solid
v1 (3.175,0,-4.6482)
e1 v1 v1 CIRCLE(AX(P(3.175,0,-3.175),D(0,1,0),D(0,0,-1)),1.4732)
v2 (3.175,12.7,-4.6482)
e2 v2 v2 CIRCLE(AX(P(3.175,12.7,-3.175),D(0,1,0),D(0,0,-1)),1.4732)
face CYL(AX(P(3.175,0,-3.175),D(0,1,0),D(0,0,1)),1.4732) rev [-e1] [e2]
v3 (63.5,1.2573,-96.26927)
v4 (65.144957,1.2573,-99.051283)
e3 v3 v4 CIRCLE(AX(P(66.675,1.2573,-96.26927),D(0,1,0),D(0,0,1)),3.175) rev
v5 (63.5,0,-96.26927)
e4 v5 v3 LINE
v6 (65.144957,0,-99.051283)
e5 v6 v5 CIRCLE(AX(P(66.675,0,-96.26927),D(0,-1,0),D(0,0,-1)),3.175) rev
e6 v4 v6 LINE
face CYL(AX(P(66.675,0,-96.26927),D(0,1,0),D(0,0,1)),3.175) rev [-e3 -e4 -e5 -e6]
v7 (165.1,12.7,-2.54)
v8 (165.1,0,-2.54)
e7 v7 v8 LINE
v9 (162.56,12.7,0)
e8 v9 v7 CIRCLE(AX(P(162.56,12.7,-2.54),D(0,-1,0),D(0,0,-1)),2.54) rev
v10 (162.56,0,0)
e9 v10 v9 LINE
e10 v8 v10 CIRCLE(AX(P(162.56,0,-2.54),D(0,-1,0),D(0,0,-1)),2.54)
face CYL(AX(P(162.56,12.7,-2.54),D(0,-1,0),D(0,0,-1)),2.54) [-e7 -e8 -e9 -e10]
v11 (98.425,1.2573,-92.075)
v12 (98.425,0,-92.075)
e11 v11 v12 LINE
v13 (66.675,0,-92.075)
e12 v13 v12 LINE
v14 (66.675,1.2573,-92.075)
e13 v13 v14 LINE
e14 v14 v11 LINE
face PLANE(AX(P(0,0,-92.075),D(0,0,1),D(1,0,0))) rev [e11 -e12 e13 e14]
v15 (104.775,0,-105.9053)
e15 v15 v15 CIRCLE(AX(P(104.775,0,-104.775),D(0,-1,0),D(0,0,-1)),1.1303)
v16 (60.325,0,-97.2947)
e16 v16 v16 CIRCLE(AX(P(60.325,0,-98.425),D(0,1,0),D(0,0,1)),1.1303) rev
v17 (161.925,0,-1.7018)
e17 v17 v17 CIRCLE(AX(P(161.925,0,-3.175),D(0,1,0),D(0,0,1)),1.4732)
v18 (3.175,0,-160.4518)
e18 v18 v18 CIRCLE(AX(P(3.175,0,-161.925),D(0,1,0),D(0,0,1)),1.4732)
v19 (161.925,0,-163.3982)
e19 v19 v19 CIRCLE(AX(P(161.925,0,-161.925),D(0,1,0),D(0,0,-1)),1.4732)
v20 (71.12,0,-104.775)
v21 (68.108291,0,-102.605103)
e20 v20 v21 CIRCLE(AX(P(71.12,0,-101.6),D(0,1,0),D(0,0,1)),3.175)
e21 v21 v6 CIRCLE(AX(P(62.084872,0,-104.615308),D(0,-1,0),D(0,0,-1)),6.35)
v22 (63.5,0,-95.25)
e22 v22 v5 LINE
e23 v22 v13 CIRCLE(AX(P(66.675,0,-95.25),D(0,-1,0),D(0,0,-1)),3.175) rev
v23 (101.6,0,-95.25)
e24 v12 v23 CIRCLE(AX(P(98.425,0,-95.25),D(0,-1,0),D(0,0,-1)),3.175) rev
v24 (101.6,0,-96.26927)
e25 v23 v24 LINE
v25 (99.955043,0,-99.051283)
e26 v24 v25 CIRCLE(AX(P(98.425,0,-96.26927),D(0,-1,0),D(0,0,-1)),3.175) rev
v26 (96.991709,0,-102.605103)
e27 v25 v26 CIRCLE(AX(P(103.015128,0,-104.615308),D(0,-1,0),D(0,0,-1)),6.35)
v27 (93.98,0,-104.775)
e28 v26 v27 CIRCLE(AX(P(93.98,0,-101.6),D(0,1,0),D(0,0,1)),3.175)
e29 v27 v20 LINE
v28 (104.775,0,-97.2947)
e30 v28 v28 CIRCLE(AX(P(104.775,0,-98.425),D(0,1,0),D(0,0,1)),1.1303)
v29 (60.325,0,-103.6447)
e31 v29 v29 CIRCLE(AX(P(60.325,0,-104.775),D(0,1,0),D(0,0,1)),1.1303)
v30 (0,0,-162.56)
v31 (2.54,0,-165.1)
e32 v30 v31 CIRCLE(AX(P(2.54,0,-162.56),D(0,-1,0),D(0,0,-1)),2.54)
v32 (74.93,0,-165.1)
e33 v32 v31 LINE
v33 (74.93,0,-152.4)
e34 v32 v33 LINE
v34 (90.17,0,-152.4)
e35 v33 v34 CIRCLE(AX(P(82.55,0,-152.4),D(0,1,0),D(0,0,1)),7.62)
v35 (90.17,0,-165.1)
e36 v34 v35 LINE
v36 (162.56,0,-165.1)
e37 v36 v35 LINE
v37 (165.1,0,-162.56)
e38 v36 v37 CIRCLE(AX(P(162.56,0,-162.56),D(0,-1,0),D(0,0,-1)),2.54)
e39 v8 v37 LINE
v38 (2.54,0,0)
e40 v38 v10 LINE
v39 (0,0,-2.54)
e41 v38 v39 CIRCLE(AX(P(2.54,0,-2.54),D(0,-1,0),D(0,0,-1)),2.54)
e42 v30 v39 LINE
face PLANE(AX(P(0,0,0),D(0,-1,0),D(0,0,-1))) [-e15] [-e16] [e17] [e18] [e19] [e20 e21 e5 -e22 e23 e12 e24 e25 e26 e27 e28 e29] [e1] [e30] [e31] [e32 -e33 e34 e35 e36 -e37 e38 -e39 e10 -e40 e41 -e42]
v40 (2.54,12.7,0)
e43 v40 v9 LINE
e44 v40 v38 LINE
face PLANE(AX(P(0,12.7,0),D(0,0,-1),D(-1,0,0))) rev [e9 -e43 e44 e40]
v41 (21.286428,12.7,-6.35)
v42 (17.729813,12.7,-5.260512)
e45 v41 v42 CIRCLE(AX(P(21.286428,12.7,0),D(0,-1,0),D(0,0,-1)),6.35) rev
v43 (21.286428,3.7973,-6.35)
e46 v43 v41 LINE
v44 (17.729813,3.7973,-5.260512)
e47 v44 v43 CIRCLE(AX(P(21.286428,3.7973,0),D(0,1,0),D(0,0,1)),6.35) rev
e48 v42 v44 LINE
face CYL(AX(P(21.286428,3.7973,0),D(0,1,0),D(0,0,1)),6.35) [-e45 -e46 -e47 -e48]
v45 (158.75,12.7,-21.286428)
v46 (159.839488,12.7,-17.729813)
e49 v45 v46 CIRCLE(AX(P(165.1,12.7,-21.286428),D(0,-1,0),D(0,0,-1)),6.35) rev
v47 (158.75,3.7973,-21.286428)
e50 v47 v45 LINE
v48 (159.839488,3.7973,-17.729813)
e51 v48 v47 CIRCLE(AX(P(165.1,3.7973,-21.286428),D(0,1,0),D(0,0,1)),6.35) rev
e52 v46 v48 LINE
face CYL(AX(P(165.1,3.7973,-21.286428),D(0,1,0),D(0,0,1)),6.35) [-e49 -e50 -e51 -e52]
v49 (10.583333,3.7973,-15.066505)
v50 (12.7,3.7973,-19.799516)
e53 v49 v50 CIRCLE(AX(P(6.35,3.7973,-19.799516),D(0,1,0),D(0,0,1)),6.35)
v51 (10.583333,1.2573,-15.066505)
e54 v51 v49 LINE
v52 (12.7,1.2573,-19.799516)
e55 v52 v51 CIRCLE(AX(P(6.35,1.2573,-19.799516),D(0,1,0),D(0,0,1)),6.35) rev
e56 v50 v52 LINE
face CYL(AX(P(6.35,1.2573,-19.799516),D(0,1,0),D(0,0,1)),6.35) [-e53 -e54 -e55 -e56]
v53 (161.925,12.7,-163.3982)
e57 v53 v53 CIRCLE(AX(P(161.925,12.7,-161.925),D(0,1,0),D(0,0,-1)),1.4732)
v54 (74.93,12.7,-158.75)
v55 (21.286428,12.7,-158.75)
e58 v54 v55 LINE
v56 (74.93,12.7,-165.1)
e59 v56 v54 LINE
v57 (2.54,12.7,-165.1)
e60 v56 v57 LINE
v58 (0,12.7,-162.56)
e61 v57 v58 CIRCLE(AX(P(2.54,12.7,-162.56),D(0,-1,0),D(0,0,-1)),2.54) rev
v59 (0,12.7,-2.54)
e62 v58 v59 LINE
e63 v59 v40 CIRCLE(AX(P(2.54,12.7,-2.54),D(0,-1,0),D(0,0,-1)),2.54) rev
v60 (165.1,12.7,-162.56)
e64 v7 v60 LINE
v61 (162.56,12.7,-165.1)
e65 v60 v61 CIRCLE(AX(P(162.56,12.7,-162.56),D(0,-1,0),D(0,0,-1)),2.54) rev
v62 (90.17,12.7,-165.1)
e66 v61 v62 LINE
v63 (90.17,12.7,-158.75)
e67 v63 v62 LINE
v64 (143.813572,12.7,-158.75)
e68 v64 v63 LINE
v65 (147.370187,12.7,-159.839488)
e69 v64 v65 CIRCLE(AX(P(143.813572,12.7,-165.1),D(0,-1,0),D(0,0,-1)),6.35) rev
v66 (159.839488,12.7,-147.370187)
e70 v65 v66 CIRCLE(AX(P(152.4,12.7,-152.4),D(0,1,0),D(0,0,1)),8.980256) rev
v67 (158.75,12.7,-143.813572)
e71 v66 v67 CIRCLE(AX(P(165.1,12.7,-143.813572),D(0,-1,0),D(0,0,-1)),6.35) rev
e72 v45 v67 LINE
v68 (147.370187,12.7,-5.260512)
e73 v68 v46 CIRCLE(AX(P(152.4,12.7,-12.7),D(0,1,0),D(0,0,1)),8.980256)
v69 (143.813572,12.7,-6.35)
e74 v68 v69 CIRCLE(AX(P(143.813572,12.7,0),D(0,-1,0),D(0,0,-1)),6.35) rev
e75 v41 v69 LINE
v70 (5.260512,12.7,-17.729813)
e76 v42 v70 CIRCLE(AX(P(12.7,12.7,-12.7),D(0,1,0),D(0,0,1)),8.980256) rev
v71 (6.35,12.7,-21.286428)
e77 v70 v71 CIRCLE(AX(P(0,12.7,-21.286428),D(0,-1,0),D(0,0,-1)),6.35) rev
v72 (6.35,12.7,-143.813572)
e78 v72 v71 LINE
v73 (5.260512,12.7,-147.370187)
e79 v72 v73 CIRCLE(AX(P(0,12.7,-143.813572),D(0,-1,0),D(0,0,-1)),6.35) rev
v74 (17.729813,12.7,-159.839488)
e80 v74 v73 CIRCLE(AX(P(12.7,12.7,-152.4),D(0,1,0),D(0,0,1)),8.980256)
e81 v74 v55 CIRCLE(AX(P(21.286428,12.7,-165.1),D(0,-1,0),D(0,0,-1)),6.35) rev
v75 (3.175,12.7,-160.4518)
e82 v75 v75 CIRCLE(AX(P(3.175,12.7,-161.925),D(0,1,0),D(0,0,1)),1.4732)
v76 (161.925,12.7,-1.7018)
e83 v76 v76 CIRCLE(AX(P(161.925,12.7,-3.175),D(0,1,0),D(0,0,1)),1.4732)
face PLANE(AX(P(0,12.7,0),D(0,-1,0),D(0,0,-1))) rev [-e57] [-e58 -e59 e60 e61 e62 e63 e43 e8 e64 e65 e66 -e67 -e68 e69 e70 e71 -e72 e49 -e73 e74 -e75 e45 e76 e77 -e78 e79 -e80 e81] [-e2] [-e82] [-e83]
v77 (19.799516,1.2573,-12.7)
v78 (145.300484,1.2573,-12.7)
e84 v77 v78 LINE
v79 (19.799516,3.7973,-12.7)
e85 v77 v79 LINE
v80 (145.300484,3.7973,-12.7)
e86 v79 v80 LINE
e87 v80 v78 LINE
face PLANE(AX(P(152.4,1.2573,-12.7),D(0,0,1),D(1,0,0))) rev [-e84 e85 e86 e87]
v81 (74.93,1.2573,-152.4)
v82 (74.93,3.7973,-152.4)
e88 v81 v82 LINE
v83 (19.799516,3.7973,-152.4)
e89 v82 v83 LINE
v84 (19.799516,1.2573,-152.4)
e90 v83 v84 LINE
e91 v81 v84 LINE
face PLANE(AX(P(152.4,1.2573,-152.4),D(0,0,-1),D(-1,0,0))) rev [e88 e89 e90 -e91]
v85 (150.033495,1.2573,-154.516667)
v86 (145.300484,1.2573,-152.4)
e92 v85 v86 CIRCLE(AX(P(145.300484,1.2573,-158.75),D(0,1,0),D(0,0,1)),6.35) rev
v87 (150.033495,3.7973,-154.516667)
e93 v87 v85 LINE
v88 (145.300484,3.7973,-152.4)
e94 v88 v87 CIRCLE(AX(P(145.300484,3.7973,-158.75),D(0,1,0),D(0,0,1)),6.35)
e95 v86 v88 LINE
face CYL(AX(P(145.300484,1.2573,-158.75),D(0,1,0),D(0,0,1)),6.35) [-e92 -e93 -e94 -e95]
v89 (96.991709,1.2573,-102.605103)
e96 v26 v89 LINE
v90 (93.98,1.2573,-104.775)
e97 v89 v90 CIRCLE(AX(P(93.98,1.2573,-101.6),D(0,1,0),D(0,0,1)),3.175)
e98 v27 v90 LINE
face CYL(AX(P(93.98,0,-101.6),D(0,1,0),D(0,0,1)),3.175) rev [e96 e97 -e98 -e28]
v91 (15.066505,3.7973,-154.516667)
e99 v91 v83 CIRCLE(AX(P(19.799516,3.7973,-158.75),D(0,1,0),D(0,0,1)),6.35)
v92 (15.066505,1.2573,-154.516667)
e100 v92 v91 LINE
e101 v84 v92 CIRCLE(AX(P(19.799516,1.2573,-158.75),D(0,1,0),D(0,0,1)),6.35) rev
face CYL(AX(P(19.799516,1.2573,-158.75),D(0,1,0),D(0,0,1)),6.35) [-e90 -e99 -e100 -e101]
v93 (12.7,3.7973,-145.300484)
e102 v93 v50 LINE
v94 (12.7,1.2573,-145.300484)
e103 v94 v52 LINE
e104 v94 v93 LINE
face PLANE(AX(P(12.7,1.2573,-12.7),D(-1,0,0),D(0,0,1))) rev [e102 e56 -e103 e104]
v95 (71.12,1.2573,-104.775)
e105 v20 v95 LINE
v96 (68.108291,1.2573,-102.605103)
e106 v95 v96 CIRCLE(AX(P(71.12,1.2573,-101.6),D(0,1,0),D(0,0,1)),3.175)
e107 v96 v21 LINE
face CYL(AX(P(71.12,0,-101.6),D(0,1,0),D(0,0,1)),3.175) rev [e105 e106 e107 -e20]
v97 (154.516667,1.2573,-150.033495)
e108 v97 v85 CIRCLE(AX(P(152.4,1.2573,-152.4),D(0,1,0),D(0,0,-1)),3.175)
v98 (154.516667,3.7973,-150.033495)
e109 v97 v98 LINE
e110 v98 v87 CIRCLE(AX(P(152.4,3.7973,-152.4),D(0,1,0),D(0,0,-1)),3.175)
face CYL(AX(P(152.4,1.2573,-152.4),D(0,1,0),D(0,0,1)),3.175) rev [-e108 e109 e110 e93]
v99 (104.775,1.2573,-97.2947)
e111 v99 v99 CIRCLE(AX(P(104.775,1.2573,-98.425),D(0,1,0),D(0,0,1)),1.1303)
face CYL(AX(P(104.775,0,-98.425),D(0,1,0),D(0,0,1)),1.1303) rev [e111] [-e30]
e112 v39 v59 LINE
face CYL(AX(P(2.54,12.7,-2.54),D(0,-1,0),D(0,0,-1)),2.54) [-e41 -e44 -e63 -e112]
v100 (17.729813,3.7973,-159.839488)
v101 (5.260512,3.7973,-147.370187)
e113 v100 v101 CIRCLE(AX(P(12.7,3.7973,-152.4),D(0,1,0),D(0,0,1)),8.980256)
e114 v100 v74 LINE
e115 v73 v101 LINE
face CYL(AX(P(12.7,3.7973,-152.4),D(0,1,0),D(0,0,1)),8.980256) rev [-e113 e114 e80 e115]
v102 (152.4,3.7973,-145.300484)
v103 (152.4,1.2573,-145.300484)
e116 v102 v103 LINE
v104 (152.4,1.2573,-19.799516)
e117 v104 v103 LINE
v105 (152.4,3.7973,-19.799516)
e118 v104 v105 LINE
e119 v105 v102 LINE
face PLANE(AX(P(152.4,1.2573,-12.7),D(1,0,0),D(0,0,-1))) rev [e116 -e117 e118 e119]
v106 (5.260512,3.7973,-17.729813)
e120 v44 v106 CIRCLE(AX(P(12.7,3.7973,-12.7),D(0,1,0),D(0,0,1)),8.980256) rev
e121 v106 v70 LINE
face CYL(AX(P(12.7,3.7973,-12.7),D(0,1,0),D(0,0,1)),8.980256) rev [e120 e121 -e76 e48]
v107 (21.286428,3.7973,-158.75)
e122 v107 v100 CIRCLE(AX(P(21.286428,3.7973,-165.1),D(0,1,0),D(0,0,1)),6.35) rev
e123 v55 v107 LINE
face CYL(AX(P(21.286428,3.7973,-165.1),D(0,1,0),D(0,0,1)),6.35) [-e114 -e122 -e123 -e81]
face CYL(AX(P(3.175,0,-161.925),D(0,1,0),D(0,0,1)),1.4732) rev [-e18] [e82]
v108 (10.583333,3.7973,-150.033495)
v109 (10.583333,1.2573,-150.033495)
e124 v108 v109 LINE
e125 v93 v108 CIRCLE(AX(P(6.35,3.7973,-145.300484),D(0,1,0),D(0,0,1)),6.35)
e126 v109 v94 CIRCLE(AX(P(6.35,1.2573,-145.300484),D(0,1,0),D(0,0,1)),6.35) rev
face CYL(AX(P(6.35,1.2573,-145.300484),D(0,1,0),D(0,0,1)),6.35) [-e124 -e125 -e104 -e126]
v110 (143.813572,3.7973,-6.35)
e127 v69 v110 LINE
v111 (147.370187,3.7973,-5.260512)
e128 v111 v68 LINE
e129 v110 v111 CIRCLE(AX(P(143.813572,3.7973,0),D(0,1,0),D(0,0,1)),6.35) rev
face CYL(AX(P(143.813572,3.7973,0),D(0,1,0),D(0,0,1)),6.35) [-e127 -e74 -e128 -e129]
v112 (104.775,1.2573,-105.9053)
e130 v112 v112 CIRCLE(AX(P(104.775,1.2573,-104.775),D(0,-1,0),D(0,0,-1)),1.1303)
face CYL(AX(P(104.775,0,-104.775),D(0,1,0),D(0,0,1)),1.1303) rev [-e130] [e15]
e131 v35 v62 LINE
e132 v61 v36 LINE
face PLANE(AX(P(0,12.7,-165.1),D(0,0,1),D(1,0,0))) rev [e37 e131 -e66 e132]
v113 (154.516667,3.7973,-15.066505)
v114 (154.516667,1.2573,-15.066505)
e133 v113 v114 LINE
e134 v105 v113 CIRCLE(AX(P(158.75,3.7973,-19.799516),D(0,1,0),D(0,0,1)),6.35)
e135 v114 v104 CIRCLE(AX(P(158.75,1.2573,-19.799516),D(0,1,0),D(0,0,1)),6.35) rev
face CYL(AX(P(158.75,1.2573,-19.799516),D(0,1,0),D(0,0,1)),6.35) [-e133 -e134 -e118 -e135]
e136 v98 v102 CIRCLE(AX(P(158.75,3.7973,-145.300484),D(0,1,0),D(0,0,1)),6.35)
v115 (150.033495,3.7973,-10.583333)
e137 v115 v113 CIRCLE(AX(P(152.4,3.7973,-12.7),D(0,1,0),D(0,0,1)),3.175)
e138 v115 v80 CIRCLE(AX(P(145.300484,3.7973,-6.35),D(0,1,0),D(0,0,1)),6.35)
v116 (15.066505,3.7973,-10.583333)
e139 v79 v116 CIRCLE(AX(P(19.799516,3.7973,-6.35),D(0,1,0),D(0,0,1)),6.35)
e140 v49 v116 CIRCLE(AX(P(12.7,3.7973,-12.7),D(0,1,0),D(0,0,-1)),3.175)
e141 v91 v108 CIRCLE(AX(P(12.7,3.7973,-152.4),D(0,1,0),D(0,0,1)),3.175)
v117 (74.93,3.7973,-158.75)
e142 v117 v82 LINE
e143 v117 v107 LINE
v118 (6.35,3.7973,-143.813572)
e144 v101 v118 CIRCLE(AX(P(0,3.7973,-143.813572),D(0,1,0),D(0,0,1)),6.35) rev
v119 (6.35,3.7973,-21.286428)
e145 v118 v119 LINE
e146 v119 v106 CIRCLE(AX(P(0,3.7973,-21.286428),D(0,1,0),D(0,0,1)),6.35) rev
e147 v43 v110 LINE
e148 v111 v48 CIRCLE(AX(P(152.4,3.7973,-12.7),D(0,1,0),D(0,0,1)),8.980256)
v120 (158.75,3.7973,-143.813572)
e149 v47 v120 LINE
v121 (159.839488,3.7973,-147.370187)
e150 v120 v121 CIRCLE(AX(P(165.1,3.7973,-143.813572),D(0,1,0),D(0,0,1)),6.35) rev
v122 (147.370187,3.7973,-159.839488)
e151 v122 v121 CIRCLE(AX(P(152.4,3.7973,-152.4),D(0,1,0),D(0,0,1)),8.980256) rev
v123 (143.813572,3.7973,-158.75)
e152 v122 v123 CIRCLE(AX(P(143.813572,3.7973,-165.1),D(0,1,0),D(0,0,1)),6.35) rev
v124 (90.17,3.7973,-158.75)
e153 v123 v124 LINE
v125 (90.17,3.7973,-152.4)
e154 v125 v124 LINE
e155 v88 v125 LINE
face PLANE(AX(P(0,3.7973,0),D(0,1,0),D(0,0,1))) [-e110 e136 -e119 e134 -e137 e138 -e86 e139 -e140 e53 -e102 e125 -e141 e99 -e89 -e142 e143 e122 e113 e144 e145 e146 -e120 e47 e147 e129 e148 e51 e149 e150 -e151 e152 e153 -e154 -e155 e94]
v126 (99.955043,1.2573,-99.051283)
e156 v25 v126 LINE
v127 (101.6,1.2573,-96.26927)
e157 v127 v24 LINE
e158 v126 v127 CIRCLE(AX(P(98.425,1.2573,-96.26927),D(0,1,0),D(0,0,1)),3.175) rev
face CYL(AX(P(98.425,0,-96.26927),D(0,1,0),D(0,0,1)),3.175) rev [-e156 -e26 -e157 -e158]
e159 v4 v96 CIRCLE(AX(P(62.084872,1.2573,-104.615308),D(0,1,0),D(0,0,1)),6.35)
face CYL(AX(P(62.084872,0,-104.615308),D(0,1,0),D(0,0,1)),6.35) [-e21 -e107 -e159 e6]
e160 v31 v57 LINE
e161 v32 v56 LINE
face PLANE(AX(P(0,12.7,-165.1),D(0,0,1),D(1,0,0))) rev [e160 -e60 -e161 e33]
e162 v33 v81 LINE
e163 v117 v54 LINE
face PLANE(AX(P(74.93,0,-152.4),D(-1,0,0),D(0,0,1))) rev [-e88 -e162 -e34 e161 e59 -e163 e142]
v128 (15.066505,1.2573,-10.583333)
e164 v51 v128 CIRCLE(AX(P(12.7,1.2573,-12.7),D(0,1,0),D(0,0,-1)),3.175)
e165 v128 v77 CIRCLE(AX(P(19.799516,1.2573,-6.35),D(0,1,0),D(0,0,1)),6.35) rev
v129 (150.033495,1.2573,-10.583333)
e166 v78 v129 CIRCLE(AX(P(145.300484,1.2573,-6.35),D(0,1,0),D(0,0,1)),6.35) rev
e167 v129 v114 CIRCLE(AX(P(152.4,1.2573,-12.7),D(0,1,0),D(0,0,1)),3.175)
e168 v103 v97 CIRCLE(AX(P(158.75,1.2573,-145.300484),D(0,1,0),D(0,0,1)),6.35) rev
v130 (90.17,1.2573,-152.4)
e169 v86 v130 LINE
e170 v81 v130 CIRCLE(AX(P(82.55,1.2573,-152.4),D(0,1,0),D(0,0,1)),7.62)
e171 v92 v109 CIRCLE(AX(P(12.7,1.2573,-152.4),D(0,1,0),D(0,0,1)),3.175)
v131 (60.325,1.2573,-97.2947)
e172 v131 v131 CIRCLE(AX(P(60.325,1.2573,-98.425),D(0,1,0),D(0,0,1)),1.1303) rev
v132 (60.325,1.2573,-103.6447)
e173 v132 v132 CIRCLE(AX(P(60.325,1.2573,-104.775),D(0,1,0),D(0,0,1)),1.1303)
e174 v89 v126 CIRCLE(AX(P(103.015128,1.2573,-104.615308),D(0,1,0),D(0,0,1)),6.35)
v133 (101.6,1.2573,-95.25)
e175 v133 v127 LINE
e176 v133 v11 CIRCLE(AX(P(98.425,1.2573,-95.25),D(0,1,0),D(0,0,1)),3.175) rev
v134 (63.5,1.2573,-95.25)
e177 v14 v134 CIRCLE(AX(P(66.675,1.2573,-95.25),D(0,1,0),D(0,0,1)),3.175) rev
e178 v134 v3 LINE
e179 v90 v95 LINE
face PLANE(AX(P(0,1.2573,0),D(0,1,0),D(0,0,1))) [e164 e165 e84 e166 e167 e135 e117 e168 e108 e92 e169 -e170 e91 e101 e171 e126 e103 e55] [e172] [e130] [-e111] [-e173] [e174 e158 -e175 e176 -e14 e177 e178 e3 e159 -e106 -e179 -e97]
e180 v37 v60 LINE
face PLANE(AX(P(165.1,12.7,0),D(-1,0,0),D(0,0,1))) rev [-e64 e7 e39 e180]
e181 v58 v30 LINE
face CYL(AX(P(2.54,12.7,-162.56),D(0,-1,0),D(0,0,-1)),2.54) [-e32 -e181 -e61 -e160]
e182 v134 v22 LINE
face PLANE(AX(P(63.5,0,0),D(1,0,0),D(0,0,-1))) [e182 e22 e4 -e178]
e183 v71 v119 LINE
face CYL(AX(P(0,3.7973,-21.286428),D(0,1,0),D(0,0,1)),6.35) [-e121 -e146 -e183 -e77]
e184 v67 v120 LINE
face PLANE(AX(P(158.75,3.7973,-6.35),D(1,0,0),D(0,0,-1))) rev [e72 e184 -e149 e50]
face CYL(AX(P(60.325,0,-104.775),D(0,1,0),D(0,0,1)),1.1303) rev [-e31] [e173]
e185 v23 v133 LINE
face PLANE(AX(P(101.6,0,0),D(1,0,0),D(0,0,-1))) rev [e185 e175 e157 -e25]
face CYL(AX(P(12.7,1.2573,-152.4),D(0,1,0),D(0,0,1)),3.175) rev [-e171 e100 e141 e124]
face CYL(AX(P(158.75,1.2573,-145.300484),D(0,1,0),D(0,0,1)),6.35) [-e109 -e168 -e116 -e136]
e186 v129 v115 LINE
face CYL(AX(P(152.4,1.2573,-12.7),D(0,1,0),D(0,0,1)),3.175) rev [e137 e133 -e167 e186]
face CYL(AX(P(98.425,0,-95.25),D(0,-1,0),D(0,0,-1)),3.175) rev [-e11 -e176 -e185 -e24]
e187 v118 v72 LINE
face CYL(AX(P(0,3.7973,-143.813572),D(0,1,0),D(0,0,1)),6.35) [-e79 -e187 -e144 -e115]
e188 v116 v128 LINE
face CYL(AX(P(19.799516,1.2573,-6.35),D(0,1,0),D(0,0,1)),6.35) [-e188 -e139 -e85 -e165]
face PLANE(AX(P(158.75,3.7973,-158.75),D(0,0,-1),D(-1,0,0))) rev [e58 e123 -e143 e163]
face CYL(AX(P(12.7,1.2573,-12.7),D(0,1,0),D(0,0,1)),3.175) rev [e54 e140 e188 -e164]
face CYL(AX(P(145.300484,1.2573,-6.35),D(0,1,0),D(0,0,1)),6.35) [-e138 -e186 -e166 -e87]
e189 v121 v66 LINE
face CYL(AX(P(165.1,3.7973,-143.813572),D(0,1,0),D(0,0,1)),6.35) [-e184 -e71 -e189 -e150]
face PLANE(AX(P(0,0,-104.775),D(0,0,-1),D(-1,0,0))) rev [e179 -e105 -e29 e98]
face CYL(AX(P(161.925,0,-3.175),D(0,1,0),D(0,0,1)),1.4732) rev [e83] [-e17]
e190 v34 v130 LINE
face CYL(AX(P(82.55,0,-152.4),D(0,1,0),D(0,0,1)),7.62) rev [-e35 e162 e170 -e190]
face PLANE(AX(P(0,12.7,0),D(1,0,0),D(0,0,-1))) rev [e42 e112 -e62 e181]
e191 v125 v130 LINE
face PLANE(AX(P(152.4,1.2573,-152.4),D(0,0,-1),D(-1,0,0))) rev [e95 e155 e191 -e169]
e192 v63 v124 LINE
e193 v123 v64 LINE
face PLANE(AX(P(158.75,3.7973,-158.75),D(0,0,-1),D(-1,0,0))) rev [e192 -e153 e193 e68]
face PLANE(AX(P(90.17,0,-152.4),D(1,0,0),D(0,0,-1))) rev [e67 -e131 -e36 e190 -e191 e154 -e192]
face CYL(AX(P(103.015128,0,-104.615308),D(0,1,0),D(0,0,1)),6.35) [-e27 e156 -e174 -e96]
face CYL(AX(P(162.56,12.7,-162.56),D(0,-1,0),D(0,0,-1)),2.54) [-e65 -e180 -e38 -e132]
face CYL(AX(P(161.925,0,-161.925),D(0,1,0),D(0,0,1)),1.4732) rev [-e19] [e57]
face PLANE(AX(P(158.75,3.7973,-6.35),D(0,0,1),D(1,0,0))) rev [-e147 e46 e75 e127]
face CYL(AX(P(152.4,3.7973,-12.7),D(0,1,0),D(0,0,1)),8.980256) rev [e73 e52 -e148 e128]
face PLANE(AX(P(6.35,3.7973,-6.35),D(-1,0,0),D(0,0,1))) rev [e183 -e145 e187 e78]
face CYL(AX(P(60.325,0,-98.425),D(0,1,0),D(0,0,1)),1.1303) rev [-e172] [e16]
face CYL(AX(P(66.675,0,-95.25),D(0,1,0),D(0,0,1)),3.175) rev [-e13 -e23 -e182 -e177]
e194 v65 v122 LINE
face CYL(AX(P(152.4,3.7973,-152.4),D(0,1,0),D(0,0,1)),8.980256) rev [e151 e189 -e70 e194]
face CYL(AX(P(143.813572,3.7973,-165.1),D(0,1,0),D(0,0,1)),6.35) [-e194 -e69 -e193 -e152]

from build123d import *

# Parameters (mm, degrees)
SKETCH2_W           = 165.1
SKETCH2_H           = 165.1
BOSS_EXTRUDE1_DEPTH = 12.7
SKETCH3_W           = 152.4
SKETCH3_H           = 152.4
CUT_EXTRUDE1_DEPTH  = 8.9027
SKETCH4_W           = 139.7
SKETCH4_H           = 139.7
CUT_EXTRUDE2_DEPTH  = 2.54
SKETCH5_R           = 1.1303
CUT_EXTRUDE4_DEPTH  = 234.766882563
SKETCH6_R           = 1.4732
CUT_EXTRUDE5_DEPTH  = 234.831798522
FILLET2_R           = 2.54
CUT_EXTRUDE6_DEPTH  = 234.831798522
CUT_EXTRUDE11_DEPTH = 8.9027
SKETCH9_R           = 3.175
CUT_EXTRUDE12_DEPTH = 2.54
FILLET3_R           = 6.35
FILLET4_R           = 6.35
FILLET5_START       = -1
FILLET5_DEPTH       = 3
FILLET6_R           = 3.175


with BuildPart() as part:
    # Sketch2 → Boss-Extrude1 (new body)
    with BuildSketch(Plane(origin=(0, 0, 0), x_dir=(1, 0, 0), z_dir=(0, 1, 0))):
        with Locations((82.55, 82.55)):
            Rectangle(SKETCH2_W, SKETCH2_H)
    extrude(amount=BOSS_EXTRUDE1_DEPTH)

    # Sketch3 → Cut-Extrude1 (cut)
    with BuildSketch(Plane(origin=(0, 12.7, 0), x_dir=(1, 0, 0), z_dir=(0, 1, 0))):
        with Locations((82.55, 82.55)):
            Rectangle(SKETCH3_W, SKETCH3_H)
    extrude(amount=-CUT_EXTRUDE1_DEPTH, mode=Mode.SUBTRACT)

    # Sketch4 → Cut-Extrude2 (cut)
    with BuildSketch(Plane(origin=(0, 3.7973, 0), x_dir=(1, 0, 0), z_dir=(0, 1, 0))):
        with Locations((82.55, 82.55)):
            Rectangle(SKETCH4_W, SKETCH4_H)
    extrude(amount=-CUT_EXTRUDE2_DEPTH, mode=Mode.SUBTRACT)

    # Sketch5 → Cut-Extrude4 (cut, through all)
    with BuildSketch(Plane(origin=(0, 1.2573, 0), x_dir=(1, 0, 0), z_dir=(0, 1, 0))):
        with BuildLine():
            Line((93.98, 104.775), (71.12, 104.775))
            ThreePointArc((71.12, 104.775), (67.945, 101.6), (71.12, 98.425))
            Line((71.12, 98.425), (93.98, 98.425))
            ThreePointArc((93.98, 98.425), (97.155, 101.6), (93.98, 104.775))
        make_face()
        with Locations(Location((60.325, 98.425, 0), (0, 0, 270))):
            Circle(SKETCH5_R)
        with Locations(Location((104.775, 98.425, 0), (0, 0, 270))):
            Circle(SKETCH5_R)
        Polygon((101.6, 98.425), (93.98, 98.425), (71.12, 98.425), (63.5, 98.425), (63.5, 92.075), (101.6, 92.075), align=None)
        with Locations(Location((60.325, 104.775, 0), (0, 0, 270))):
            Circle(SKETCH5_R)
        with Locations(Location((104.775, 104.775, 0), (0, 0, 90))):
            Circle(SKETCH5_R)
    extrude(amount=-CUT_EXTRUDE4_DEPTH, mode=Mode.SUBTRACT)

    # Sketch6 → Cut-Extrude5 (cut, through all)
    with BuildSketch(Plane(origin=(0, 12.7, 0), x_dir=(1, 0, 0), z_dir=(0, 1, 0))):
        with Locations(Location((3.175, 161.925, 0), (0, 0, 270))):
            Circle(SKETCH6_R)
        with Locations(Location((161.925, 161.925, 0), (0, 0, 90))):
            Circle(SKETCH6_R)
        with Locations(Location((161.925, 3.175, 0), (0, 0, 270))):
            Circle(SKETCH6_R)
        with Locations(Location((3.175, 3.175, 0), (0, 0, 90))):
            Circle(SKETCH6_R)
    extrude(amount=-CUT_EXTRUDE5_DEPTH, mode=Mode.SUBTRACT)

    # Fillet2
    fillet2_edges = [part.edges().sort_by_distance(p)[0] for p in [
        (0, 6.35, -165.1),
        (165.1, 6.35, -165.1),
        (165.1, 6.35, 0),
        (0, 6.35, 0),
    ]]
    fillet(fillet2_edges, radius=FILLET2_R)

    # Sketch7 → Cut-Extrude6 (cut, through all)
    with BuildSketch(Plane(origin=(0, 12.7, 0), x_dir=(1, 0, 0), z_dir=(0, 1, 0))):
        with BuildLine():
            Line((74.93, 152.4), (74.93, 165.1))
            ThreePointArc((74.93, 165.1), (82.55, 172.72), (90.17, 165.1))
            Line((90.17, 165.1), (90.17, 152.4))
            ThreePointArc((90.17, 152.4), (82.55, 144.78), (74.93, 152.4))
        make_face()
    extrude(amount=-CUT_EXTRUDE6_DEPTH, mode=Mode.SUBTRACT)

    # Sketch8 → Cut-Extrude11 (cut)
    with BuildSketch(Plane(origin=(0, 12.7, 0), x_dir=(1, 0, 0), z_dir=(0, 1, 0))):
        with BuildLine():
            Line((6.35, 152.4), (6.35, 158.75))
            ThreePointArc((6.35, 158.75), (3.719743879, 152.4), (6.35, 146.05))
            Line((6.35, 146.05), (6.35, 152.4))
        make_face()
        with BuildLine():
            ThreePointArc((19.05, 158.75), (12.7, 161.380256121), (6.35, 158.75))
            Line((6.35, 158.75), (12.7, 158.75))
            Line((12.7, 158.75), (19.05, 158.75))
        make_face()
        with BuildLine():
            Line((6.35, 12.7), (6.35, 19.05))
            ThreePointArc((6.35, 19.05), (3.719743879, 12.7), (6.35, 6.35))
            Line((6.35, 6.35), (6.35, 12.7))
        make_face()
        with BuildLine():
            Line((12.7, 6.35), (6.35, 6.35))
            ThreePointArc((6.35, 6.35), (12.7, 3.719743879), (19.05, 6.35))
            Line((19.05, 6.35), (12.7, 6.35))
        make_face()
        with BuildLine():
            Line((152.4, 6.35), (146.05, 6.35))
            ThreePointArc((146.05, 6.35), (152.4, 3.719743879), (158.75, 6.35))
            Line((158.75, 6.35), (152.4, 6.35))
        make_face()
        with BuildLine():
            ThreePointArc((161.380256121, 12.7), (160.696674827, 16.136595236), (158.75, 19.05))
            Line((158.75, 19.05), (158.75, 12.7))
            Line((158.75, 12.7), (158.75, 6.35))
            ThreePointArc((158.75, 6.35), (160.696674827, 9.263404764), (161.380256121, 12.7))
        make_face()
        with BuildLine():
            Line((158.75, 152.4), (158.75, 146.05))
            ThreePointArc((158.75, 146.05), (160.696674827, 148.963404764), (161.380256121, 152.4))
            ThreePointArc((161.380256121, 152.4), (160.696674827, 155.836595236), (158.75, 158.75))
            Line((158.75, 158.75), (158.75, 152.4))
        make_face()
        with BuildLine():
            ThreePointArc((158.75, 158.75), (152.4, 161.380256121), (146.05, 158.75))
            Line((146.05, 158.75), (152.4, 158.75))
            Line((152.4, 158.75), (158.75, 158.75))
        make_face()
    extrude(amount=-CUT_EXTRUDE11_DEPTH, mode=Mode.SUBTRACT)

    # Sketch9 → Cut-Extrude12 (cut)
    with BuildSketch(Plane(origin=(0, 3.7973, 0), x_dir=(1, 0, 0), z_dir=(0, 1, 0))):
        with Locations((12.7, 152.4)):
            Circle(SKETCH9_R)
        with Locations((152.4, 152.4)):
            Circle(SKETCH9_R)
        with Locations((152.4, 12.7)):
            Circle(SKETCH9_R)
        with Locations((12.7, 12.7)):
            Circle(SKETCH9_R)
    extrude(amount=-CUT_EXTRUDE12_DEPTH, mode=Mode.SUBTRACT)

    # Fillet3
    fillet3_edges = [part.edges().sort_by_distance(p)[0] for p in [
        (149.225, 2.5273, -12.7),
        (15.875, 2.5273, -12.7),
        (152.4, 2.5273, -149.225),
        (12.7, 2.5273, -149.225),
        (12.7, 2.5273, -15.875),
        (152.4, 2.5273, -15.875),
        (149.225, 2.5273, -152.4),
        (15.875, 2.5273, -152.4),
    ]]
    fillet(fillet3_edges, radius=FILLET3_R)

    # Fillet4
    fillet4_edges = [part.edges().sort_by_distance(p)[0] for p in [
        (146.05, 8.24865, -158.75),
        (146.05, 8.24865, -6.35),
        (19.05, 8.24865, -6.35),
        (6.35, 8.24865, -146.05),
        (19.05, 8.24865, -158.75),
        (6.35, 8.24865, -19.05),
        (158.75, 8.24865, -19.05),
        (158.75, 8.24865, -146.05),
    ]]
    fillet(fillet4_edges, radius=FILLET4_R)

    # Fillet5: read off the stored shape, not the designer's step
    # Fillet5 outline → Fillet5 (cut)
    with BuildSketch(Plane(origin=(0, 0, 0), x_dir=(1, 0, 0), z_dir=(0, 1, 0)).offset(FILLET5_START)):
        with BuildLine():
            ThreePointArc((101.6, 98.425), (98.748828907, 99.911991034), (96.991709431, 102.605102634))
            ThreePointArc((96.991709431, 102.605102634), (96.556026578, 99.744006447), (93.98, 98.425))
            Line((93.98, 98.425), (101.6, 98.425))
        make_face()
        with BuildLine():
            ThreePointArc((68.108290569, 102.605102634), (66.351171093, 99.911991034), (63.5, 98.425))
            Line((63.5, 98.425), (71.12, 98.425))
            ThreePointArc((71.12, 98.425), (68.543973422, 99.744006447), (68.108290569, 102.605102634))
        make_face()
    extrude(amount=FILLET5_DEPTH, mode=Mode.SUBTRACT)

    # Fillet6
    fillet6_edges = [part.edges().sort_by_distance(p)[0] for p in [
        (101.6, 0.62865, -98.425),
        (101.6, 0.62865, -92.075),
        (63.5, 0.62865, -92.075),
        (63.5, 0.62865, -98.425),
    ]]
    fillet(fillet6_edges, radius=FILLET6_R)


solid = part.part
